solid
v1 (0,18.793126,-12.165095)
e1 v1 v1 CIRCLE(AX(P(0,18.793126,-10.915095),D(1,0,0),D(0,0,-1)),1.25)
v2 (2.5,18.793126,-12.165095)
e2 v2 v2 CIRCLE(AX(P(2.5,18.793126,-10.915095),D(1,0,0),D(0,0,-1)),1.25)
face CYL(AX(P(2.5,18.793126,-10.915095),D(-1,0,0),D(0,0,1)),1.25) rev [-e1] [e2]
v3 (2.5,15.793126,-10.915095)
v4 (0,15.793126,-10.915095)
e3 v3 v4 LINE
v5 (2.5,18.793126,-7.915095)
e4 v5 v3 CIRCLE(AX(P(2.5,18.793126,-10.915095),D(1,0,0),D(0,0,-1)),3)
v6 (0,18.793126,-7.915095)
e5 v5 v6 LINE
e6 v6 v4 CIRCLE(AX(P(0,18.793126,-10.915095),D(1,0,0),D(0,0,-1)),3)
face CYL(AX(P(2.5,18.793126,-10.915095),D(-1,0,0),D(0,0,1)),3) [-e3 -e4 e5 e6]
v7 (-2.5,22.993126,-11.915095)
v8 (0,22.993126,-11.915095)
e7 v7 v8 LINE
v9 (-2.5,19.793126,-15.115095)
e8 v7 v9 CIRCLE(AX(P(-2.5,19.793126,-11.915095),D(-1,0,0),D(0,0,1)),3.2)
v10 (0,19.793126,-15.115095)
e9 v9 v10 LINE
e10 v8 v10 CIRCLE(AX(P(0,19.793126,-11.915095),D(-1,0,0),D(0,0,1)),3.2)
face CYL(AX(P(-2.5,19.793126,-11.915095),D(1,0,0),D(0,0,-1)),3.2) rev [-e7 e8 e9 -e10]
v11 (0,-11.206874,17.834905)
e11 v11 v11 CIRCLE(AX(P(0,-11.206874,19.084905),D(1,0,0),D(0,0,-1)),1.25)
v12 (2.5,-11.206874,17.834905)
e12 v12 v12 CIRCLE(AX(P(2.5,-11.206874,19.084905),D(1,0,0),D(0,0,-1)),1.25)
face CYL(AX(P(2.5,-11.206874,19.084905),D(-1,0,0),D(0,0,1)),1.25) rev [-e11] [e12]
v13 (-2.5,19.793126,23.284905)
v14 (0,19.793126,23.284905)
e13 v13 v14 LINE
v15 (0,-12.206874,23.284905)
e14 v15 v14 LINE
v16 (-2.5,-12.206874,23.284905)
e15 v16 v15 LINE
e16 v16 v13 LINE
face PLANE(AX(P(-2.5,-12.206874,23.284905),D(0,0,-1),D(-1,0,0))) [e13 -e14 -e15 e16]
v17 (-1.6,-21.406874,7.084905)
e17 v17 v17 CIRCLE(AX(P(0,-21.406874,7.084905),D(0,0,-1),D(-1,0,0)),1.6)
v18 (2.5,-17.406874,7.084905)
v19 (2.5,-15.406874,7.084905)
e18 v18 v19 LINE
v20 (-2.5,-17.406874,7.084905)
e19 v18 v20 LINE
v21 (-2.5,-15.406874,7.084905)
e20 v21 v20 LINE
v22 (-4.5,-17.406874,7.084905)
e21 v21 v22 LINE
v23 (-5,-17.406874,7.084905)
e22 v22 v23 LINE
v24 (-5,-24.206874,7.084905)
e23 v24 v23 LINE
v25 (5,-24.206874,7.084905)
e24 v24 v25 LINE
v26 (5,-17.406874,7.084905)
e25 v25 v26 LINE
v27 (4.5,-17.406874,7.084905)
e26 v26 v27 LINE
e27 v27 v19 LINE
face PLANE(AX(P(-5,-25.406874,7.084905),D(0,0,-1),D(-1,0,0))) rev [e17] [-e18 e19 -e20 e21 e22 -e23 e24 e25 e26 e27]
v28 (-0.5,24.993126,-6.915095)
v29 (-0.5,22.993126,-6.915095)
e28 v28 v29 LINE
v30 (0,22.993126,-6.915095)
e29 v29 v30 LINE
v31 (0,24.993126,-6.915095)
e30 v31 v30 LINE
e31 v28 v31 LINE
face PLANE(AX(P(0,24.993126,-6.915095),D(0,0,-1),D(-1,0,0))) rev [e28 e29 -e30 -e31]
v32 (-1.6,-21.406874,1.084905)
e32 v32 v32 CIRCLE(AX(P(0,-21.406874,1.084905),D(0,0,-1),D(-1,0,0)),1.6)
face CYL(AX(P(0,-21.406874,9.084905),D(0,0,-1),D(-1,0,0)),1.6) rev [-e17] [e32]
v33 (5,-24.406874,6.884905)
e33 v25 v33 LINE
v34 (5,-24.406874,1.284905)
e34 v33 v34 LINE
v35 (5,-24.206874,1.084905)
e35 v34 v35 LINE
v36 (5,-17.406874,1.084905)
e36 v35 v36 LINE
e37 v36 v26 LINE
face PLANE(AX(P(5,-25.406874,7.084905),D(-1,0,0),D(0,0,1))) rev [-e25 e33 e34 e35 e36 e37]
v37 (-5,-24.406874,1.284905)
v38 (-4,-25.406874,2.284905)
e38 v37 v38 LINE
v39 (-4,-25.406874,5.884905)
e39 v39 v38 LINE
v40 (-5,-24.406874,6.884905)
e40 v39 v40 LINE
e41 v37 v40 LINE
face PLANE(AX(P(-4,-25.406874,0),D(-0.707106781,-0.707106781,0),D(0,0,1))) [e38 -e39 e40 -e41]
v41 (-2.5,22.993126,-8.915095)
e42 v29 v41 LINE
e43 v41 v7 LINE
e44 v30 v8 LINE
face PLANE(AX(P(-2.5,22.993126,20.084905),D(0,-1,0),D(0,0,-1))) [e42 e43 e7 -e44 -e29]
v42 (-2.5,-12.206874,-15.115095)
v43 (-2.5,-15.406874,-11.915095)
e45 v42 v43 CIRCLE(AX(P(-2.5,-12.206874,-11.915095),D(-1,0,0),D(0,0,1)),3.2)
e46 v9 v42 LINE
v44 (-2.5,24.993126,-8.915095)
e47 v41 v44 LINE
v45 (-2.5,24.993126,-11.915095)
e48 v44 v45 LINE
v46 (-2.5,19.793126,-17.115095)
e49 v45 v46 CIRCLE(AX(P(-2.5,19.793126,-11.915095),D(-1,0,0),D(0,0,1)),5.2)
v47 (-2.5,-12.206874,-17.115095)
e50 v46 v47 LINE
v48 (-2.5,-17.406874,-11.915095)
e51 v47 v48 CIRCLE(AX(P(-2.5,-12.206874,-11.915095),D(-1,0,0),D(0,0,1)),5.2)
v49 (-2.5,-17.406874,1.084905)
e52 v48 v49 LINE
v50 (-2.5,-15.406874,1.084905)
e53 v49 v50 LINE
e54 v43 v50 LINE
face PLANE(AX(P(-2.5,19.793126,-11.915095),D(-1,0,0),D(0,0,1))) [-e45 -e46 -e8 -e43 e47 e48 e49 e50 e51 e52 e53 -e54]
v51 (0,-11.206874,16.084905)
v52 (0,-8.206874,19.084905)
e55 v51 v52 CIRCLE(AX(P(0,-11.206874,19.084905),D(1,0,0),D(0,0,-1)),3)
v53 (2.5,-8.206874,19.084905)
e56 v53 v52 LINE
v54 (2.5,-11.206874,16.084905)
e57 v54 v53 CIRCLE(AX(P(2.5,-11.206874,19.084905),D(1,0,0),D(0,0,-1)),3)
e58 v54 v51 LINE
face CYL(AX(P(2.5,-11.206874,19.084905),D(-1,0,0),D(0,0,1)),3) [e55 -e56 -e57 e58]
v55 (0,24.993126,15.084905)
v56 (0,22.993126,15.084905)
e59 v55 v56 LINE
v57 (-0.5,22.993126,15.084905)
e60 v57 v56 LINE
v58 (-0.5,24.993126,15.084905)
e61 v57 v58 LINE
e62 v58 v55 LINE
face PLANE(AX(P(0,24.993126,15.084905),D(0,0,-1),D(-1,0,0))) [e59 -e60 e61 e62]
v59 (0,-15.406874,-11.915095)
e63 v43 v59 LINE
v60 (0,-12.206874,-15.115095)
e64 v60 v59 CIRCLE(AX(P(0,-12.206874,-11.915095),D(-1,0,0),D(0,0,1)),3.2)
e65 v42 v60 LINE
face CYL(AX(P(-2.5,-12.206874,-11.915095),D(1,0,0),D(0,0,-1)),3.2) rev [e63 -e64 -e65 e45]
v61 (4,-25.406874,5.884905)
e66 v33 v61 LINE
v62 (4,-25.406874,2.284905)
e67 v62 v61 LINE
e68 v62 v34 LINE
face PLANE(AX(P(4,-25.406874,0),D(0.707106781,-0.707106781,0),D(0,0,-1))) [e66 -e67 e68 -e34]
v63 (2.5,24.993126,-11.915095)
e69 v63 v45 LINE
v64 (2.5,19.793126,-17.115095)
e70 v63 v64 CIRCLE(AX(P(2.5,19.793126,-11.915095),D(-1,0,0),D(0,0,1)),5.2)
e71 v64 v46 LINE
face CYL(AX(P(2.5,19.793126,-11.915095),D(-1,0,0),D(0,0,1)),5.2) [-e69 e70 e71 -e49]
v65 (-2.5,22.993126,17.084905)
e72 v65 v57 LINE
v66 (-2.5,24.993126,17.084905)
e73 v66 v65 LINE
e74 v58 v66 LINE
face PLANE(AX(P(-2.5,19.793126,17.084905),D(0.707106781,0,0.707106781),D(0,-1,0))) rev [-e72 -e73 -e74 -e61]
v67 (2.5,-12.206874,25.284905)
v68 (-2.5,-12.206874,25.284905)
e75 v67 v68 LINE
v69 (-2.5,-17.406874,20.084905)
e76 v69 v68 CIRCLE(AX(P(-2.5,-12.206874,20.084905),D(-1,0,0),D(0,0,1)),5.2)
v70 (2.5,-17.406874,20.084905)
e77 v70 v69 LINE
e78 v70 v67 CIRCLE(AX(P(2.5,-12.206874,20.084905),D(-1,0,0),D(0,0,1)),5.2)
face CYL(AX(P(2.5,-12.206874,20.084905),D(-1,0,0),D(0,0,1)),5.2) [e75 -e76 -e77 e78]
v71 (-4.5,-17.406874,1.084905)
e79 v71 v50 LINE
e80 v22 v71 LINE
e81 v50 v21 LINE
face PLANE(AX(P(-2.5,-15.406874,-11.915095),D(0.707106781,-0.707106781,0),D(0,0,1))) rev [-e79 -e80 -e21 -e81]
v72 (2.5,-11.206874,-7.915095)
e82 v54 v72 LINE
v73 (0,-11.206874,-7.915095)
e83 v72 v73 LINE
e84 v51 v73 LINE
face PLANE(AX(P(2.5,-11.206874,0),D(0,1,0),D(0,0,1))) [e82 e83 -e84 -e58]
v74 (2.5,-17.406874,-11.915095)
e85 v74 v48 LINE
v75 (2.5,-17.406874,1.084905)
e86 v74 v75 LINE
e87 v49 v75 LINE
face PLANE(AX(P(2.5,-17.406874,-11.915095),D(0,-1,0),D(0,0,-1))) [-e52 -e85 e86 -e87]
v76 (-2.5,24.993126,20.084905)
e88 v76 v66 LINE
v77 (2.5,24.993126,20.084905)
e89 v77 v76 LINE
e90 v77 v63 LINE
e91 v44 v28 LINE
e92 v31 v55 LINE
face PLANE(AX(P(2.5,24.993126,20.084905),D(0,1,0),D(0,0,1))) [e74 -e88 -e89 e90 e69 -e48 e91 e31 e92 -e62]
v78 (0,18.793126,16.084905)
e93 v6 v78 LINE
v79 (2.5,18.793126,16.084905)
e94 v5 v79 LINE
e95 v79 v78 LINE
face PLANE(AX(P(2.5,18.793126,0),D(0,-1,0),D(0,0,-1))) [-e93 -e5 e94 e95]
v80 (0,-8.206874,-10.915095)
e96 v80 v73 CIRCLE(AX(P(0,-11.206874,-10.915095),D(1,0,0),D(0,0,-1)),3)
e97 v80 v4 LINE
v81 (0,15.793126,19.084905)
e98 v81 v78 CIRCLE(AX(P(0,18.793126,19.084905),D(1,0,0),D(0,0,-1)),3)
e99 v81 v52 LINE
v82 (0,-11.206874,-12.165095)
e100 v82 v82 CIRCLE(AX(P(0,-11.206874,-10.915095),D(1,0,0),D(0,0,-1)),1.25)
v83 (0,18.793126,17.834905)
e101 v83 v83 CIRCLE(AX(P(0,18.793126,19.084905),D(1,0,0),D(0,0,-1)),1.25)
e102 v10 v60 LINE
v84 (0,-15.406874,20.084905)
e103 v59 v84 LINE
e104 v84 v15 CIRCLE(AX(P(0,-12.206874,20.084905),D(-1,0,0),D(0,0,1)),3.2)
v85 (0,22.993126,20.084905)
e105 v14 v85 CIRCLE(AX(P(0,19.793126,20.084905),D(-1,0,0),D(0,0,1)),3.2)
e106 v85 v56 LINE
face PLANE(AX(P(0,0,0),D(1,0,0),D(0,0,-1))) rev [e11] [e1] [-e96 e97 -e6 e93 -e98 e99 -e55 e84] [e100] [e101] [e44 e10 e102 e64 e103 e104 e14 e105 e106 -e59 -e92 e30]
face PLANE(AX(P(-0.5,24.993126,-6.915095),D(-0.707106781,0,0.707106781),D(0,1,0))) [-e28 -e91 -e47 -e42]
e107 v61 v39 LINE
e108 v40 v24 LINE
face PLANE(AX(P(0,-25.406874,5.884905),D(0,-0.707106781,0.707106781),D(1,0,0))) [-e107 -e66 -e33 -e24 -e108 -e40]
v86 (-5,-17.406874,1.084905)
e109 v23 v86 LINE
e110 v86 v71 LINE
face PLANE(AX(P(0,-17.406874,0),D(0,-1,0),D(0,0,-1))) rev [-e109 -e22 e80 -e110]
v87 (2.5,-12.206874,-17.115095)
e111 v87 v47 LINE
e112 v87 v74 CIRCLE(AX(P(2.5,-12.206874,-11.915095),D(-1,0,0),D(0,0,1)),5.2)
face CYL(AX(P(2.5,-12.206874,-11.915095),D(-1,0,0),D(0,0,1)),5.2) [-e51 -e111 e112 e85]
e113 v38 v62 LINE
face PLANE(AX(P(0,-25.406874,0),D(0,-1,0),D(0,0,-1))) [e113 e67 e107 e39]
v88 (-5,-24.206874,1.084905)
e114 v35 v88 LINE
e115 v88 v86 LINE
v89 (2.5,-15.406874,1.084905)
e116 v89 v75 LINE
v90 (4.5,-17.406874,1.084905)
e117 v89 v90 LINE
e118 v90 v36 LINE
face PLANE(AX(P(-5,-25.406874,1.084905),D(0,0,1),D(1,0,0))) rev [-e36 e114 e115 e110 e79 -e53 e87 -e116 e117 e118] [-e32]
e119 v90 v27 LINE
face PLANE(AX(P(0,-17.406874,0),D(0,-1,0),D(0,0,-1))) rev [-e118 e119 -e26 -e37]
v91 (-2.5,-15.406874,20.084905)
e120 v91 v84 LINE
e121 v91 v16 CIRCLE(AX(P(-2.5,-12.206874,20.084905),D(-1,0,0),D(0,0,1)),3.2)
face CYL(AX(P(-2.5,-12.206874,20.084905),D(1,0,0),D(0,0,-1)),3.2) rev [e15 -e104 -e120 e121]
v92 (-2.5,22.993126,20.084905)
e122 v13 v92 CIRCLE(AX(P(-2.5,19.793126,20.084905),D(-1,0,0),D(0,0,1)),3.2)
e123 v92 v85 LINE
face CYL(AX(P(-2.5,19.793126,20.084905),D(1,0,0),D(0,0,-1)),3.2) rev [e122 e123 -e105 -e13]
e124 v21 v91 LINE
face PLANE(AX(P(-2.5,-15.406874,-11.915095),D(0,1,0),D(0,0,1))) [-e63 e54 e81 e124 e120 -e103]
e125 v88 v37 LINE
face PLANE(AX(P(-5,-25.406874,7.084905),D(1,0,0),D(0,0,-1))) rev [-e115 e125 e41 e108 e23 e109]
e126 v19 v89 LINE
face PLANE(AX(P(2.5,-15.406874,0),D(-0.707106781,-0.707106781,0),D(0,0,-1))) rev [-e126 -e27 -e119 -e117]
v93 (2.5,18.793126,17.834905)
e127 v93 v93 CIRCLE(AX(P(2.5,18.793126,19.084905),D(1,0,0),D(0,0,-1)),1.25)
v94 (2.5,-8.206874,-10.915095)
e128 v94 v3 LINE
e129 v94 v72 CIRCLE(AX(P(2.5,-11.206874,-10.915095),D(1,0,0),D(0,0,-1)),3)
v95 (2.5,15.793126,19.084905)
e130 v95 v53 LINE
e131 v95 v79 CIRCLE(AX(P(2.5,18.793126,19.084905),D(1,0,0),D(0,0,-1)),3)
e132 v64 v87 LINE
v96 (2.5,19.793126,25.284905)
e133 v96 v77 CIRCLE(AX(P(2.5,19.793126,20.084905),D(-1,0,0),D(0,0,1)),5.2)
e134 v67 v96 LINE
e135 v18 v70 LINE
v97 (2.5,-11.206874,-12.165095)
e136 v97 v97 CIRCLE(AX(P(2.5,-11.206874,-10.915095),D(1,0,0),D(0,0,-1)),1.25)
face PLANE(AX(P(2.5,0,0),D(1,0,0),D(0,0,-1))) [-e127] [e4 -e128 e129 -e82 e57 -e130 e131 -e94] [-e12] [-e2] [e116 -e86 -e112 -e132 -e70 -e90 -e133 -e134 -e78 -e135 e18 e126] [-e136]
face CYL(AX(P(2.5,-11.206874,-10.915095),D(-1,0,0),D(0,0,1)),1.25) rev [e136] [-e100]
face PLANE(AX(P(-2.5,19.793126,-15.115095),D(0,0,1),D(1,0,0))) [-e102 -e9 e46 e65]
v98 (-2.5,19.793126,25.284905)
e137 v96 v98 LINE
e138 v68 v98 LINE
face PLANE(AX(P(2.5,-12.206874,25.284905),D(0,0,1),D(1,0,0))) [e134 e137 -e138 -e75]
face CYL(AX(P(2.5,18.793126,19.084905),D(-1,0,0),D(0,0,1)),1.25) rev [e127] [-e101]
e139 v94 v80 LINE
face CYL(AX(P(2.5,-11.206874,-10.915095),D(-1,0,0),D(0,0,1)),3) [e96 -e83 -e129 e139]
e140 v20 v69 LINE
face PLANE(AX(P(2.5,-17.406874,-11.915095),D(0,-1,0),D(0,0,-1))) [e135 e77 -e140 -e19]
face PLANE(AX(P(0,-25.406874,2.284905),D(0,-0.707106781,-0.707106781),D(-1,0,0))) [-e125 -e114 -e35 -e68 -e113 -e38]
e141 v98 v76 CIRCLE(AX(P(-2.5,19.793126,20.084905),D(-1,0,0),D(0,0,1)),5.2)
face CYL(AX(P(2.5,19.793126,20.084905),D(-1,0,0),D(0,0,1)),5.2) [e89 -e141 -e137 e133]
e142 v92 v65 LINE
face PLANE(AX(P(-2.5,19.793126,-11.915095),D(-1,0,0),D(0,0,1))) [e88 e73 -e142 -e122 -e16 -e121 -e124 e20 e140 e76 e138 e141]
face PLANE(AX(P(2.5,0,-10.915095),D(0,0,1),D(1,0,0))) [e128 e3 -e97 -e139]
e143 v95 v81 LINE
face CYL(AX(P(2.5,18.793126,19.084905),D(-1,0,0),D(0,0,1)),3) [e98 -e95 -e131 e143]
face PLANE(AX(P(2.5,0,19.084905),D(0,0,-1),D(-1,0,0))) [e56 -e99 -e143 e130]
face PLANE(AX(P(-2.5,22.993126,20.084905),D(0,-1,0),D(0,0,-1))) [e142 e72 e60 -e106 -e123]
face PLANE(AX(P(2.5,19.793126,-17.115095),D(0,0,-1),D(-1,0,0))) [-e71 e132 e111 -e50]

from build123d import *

# Parameters (mm, degrees)
SKETCH1_R           = 1.25
BOSS_EXTRUDE1_DEPTH = 2.5
BOSS_EXTRUDE2_DEPTH = 2.5
BOSS_EXTRUDE4_START = 2.5
BOSS_EXTRUDE4_DEPTH = 2.5
SKETCH5_W           = 10
SKETCH5_H           = 6
BOSS_EXTRUDE6_DEPTH = 8
CHAMFER1_SIZE       = 2
SKETCH6_R           = 1.6
CUT_EXTRUDE1_DEPTH  = 8
CHAMFER2_SIZE       = 1
CHAMFER3_SIZE       = 1.2
SKETCH7_W           = 2.5
SKETCH7_H           = 22
CUT_EXTRUDE2_DEPTH  = 55.835083878
CHAMFER4_SIZE       = 2


with BuildPart() as part:
    # Sketch1 → Boss-Extrude1 (new body)
    with BuildSketch(Plane(origin=(0, 0, 0), x_dir=(0, 0, -1), z_dir=(1, 0, 0))):
        with BuildLine():
            ThreePointArc((-20.08490506, 22.793126127), (-22.206225403, 21.914446471), (-23.08490506, 19.793126127))
            Line((-23.08490506, 19.793126127), (-23.08490506, -12.206873873))
            ThreePointArc((-23.08490506, -12.206873873), (-22.206225403, -14.328194216), (-20.08490506, -15.206873873))
            Line((-20.08490506, -15.206873873), (11.91509494, -15.206873873))
            ThreePointArc((11.91509494, -15.206873873), (14.036415284, -14.328194216), (14.91509494, -12.206873873))
            Line((14.91509494, -12.206873873), (14.91509494, 19.793126127))
            ThreePointArc((14.91509494, 19.793126127), (14.036415284, 21.914446471), (11.91509494, 22.793126127))
            Line((11.91509494, 22.793126127), (-20.08490506, 22.793126127))
        make_face()
        with Locations((-19.08490506, -11.206873873)):
            Circle(SKETCH1_R, mode=Mode.SUBTRACT)
        with Locations((10.91509494, -11.206873873)):
            Circle(SKETCH1_R, mode=Mode.SUBTRACT)
        with BuildLine():
            ThreePointArc((-19.08490506, 17.543126127), (-19.968788536, 19.677009604), (-17.83490506, 18.793126127))
            ThreePointArc((-17.83490506, 18.793126127), (-18.201021583, 17.909242651), (-19.08490506, 17.543126127))
        make_face(mode=Mode.SUBTRACT)
        with BuildLine():
            Line((-19.08490506, -8.206873873), (-19.08490506, 15.793126127))
            ThreePointArc((-19.08490506, 15.793126127), (-16.963584716, 16.671805784), (-16.08490506, 18.793126127))
            Line((-16.08490506, 18.793126127), (7.91509494, 18.793126127))
            ThreePointArc((7.91509494, 18.793126127), (8.793774597, 16.671805784), (10.91509494, 15.793126127))
            Line((10.91509494, 15.793126127), (10.91509494, -8.206873873))
            ThreePointArc((10.91509494, -8.206873873), (8.793774597, -9.085553529), (7.91509494, -11.206873873))
            Line((7.91509494, -11.206873873), (-16.08490506, -11.206873873))
            ThreePointArc((-16.08490506, -11.206873873), (-16.963584716, -9.085553529), (-19.08490506, -8.206873873))
        make_face(mode=Mode.SUBTRACT)
        with Locations((10.91509494, 18.793126127)):
            Circle(SKETCH1_R, mode=Mode.SUBTRACT)
    extrude(amount=BOSS_EXTRUDE1_DEPTH)

    # Sketch2 → Boss-Extrude2 (add)
    with BuildSketch(Plane.ZY):
        with BuildLine():
            Line((-17.11509494, 19.793126127), (-17.11509494, -12.206873873))
            ThreePointArc((-17.11509494, -12.206873873), (-15.592050202, -15.883829135), (-11.91509494, -17.406873873))
            Line((-11.91509494, -17.406873873), (20.08490506, -17.406873873))
            ThreePointArc((20.08490506, -17.406873873), (23.761860322, -15.883829135), (25.28490506, -12.206873873))
            Line((25.28490506, -12.206873873), (25.28490506, 19.793126127))
            ThreePointArc((25.28490506, 19.793126127), (23.761860322, 23.470081389), (20.08490506, 24.993126127))
            Line((20.08490506, 24.993126127), (-11.91509494, 24.993126127))
            ThreePointArc((-11.91509494, 24.993126127), (-15.592050202, 23.470081389), (-17.11509494, 19.793126127))
        make_face()
        with BuildLine():
            Line((-14.91509494, 19.793126127), (-14.91509494, -12.206873873))
            ThreePointArc((-14.91509494, -12.206873873), (-14.036415284, -14.328194216), (-11.91509494, -15.206873873))
            Line((-11.91509494, -15.206873873), (20.08490506, -15.206873873))
            ThreePointArc((20.08490506, -15.206873873), (22.206225403, -14.328194216), (23.08490506, -12.206873873))
            Line((23.08490506, -12.206873873), (23.08490506, 19.793126127))
            ThreePointArc((23.08490506, 19.793126127), (22.206225403, 21.914446471), (20.08490506, 22.793126127))
            Line((20.08490506, 22.793126127), (-11.91509494, 22.793126127))
            ThreePointArc((-11.91509494, 22.793126127), (-14.036415284, 21.914446471), (-14.91509494, 19.793126127))
        make_face(mode=Mode.SUBTRACT)
    extrude(amount=-BOSS_EXTRUDE2_DEPTH)

    # Sketch3 → Boss-Extrude4 (add)
    with BuildSketch(Plane.ZY.offset(BOSS_EXTRUDE4_START)):
        with BuildLine():
            Line((-17.11509494, 19.793126127), (-17.11509494, -12.206873873))
            ThreePointArc((-17.11509494, -12.206873873), (-15.592050202, -15.883829135), (-11.91509494, -17.406873873))
            Line((-11.91509494, -17.406873873), (20.08490506, -17.406873873))
            ThreePointArc((20.08490506, -17.406873873), (23.761860322, -15.883829135), (25.28490506, -12.206873873))
            Line((25.28490506, -12.206873873), (25.28490506, 19.793126127))
            ThreePointArc((25.28490506, 19.793126127), (23.761860322, 23.470081389), (20.08490506, 24.993126127))
            Line((20.08490506, 24.993126127), (-11.91509494, 24.993126127))
            ThreePointArc((-11.91509494, 24.993126127), (-15.592050202, 23.470081389), (-17.11509494, 19.793126127))
        make_face()
        with BuildLine():
            Line((-15.11509494, 19.793126127), (-15.11509494, -12.206873873))
            ThreePointArc((-15.11509494, -12.206873873), (-14.17783664, -14.469615573), (-11.91509494, -15.406873873))
            Line((-11.91509494, -15.406873873), (20.08490506, -15.406873873))
            ThreePointArc((20.08490506, -15.406873873), (22.34764676, -14.469615573), (23.28490506, -12.206873873))
            Line((23.28490506, -12.206873873), (23.28490506, 19.793126127))
            ThreePointArc((23.28490506, 19.793126127), (22.34764676, 22.055867827), (20.08490506, 22.993126127))
            Line((20.08490506, 22.993126127), (-11.91509494, 22.993126127))
            ThreePointArc((-11.91509494, 22.993126127), (-14.17783664, 22.055867827), (-15.11509494, 19.793126127))
        make_face(mode=Mode.SUBTRACT)
    extrude(amount=-BOSS_EXTRUDE4_DEPTH)

    # Sketch5 → Boss-Extrude6 (add)
    with BuildSketch(Plane.XZ.offset(17.406873873)):
        with Locations((0, 4.08490506)):
            Rectangle(SKETCH5_W, SKETCH5_H)
    extrude(amount=BOSS_EXTRUDE6_DEPTH)

    # Chamfer1
    chamfer1_edges = [part.edges().sort_by_distance(p)[0] for p in [
        (-2.5, -17.406873873, 4.08490506),
        (2.5, -17.406873873, 4.08490506),
    ]]
    chamfer(chamfer1_edges, length=CHAMFER1_SIZE - 0.0001)  # a hair under: the kernel refuses the full size

    # Sketch6 → Cut-Extrude1 (cut)
    with BuildSketch(Plane(origin=(0, 0, 1.08490506), x_dir=(-1, 0, 0), z_dir=(0, 0, -1))):
        with Locations((0, -21.406873873)):
            Circle(SKETCH6_R)
    extrude(amount=-CUT_EXTRUDE1_DEPTH, mode=Mode.SUBTRACT)

    # Chamfer2
    chamfer2_edges = [part.edges().sort_by_distance(p)[0] for p in [
        (-5, -25.406873873, 4.08490506),
        (5, -25.406873873, 4.08490506),
    ]]
    chamfer(chamfer2_edges, length=CHAMFER2_SIZE)

    # Chamfer3
    chamfer3_edges = [part.edges().sort_by_distance(p)[0] for p in [
        (0, -25.406873873, 1.08490506),
        (0, -25.406873873, 7.08490506),
    ]]
    chamfer(chamfer3_edges, length=CHAMFER3_SIZE)

    # Sketch7 → Cut-Extrude2 (cut, through all)
    with BuildSketch(Plane.XZ.offset(-22.993126127)):
        with Locations((-1.25, 4.08490506)):
            Rectangle(SKETCH7_W, SKETCH7_H)
    extrude(amount=-CUT_EXTRUDE2_DEPTH, mode=Mode.SUBTRACT)

    # Chamfer4
    chamfer4_edges = [part.edges().sort_by_distance(p)[0] for p in [
        (-2.5, 23.993126127, -6.91509494),
        (-2.5, 23.993126127, 15.08490506),
    ]]
    chamfer(chamfer4_edges, length=CHAMFER4_SIZE)


solid = part.part
